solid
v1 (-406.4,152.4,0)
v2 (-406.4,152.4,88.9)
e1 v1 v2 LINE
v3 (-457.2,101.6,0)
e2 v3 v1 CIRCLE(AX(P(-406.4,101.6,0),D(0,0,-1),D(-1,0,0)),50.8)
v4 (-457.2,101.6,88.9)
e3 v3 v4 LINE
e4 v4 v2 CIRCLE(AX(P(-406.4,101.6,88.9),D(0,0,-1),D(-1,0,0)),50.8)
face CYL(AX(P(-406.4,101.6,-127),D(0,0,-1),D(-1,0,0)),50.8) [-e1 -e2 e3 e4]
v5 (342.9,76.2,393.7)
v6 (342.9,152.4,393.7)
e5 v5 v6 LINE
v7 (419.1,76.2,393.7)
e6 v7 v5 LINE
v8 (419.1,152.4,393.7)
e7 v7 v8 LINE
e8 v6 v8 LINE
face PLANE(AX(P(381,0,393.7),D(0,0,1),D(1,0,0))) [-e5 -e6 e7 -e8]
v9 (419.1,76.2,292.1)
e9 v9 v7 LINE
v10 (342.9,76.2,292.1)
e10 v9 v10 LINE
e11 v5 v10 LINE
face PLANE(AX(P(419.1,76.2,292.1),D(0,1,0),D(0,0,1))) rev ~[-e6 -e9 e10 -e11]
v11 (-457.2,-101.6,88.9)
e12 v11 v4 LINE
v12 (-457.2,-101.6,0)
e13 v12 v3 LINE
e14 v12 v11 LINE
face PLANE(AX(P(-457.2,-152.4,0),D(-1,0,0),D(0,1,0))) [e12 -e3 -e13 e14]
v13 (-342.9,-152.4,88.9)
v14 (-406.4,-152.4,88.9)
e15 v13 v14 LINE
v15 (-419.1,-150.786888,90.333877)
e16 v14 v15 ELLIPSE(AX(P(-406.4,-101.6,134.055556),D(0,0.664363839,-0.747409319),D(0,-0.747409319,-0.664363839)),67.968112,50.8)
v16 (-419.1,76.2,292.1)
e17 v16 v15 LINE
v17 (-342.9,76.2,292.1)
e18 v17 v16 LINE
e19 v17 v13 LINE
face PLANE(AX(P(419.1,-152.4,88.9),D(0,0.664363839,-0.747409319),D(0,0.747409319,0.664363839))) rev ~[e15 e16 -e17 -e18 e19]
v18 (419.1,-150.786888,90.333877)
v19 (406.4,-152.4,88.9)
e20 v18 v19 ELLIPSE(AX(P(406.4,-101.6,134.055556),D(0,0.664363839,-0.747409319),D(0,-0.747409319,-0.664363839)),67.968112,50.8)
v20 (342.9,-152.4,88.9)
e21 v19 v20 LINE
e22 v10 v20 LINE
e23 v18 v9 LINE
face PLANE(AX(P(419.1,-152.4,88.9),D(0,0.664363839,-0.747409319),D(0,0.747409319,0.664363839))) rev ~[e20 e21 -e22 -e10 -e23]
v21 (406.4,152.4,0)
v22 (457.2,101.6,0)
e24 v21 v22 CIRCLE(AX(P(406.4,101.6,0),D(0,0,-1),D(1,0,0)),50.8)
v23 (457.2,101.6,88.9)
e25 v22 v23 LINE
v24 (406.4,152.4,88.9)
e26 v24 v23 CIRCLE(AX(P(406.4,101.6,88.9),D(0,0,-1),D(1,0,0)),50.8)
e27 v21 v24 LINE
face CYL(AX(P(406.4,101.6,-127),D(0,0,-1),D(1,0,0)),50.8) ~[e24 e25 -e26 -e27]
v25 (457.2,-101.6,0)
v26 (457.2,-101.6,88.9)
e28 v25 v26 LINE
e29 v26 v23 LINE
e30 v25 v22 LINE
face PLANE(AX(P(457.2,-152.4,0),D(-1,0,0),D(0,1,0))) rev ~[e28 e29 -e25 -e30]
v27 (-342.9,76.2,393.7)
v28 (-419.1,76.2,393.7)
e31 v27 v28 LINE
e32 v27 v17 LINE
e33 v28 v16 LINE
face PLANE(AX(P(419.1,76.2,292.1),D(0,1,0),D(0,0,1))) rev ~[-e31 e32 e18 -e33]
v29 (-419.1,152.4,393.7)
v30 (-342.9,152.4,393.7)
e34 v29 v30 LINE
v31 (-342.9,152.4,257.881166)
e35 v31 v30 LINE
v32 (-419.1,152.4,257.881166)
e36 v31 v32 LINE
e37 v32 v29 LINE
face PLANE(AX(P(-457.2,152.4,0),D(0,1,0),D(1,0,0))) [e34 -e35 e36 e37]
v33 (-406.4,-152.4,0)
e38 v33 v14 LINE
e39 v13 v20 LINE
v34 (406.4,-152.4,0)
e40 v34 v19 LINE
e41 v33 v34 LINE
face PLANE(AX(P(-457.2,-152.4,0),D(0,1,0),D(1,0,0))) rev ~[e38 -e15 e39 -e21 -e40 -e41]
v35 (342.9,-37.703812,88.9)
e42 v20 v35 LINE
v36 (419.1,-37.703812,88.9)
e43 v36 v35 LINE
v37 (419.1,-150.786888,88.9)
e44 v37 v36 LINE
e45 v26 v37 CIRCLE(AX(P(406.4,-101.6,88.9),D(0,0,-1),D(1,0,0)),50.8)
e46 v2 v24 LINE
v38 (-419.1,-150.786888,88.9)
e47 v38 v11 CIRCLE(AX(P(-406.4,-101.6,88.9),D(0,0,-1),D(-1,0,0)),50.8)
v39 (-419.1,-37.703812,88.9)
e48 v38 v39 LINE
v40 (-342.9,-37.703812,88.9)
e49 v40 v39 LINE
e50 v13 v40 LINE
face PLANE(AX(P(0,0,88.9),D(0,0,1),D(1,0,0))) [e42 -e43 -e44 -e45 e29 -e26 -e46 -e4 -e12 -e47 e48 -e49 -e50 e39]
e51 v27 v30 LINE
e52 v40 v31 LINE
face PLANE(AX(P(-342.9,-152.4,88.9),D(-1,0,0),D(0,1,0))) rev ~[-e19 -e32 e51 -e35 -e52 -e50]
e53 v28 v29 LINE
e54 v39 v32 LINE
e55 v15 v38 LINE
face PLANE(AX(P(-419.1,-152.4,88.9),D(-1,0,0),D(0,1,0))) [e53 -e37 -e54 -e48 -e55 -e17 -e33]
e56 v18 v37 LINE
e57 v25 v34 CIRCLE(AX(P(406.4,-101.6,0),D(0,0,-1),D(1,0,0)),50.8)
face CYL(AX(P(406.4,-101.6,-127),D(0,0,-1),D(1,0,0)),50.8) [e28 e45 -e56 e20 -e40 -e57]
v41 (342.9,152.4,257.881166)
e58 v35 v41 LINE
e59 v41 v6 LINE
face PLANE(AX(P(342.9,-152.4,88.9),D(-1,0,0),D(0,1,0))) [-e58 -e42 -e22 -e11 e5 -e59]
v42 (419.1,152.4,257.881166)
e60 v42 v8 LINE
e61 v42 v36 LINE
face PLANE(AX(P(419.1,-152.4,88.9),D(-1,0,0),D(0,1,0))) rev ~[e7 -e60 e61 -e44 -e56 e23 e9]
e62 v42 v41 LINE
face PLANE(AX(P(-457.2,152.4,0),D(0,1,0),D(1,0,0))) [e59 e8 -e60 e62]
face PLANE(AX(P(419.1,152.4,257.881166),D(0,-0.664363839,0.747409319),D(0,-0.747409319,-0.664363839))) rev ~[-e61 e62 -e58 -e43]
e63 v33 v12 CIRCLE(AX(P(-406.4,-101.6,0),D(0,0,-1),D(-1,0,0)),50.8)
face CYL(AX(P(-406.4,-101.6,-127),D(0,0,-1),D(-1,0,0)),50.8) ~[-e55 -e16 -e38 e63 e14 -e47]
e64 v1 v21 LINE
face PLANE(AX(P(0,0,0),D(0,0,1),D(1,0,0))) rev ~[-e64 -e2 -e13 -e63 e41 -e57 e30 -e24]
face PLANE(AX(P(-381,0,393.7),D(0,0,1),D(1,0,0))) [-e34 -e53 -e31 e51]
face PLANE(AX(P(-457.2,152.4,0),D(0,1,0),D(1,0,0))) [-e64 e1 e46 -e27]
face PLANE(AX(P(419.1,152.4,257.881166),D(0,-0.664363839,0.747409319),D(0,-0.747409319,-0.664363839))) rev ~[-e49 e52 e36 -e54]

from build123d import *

# Parameters (mm, degrees)
F0_W        = 914.4
F0_H        = 304.8
F1_DEPTH    = 88.9
F2_W        = 76.2
F2_H        = 304.8
F3_DEPTH    = 304.8
F5_DEPTH    = 876.301
F6_T1_DEPTH = 342.9


# Not quite as in the source:
# - a fillet or chamfer that OpenCascade refuses, or shapes differently, is made with other operations: its cross-section is extruded or revolved along the edge and cut away or added


with BuildPart() as f1:
    # F0 (on Top) → F1 (new body)
    with BuildSketch(Plane.XY):
        Rectangle(F0_W, F0_H)
    extrude(amount=F1_DEPTH)

    # F2 (on face) → F3 (join)
    with BuildSketch(Plane.XY.offset(88.9)):
        with Locations((-381, 0)):
            Rectangle(F2_W, F2_H)
        with Locations((381, 0)):
            Rectangle(F2_W, F2_H)
    extrude(amount=F3_DEPTH)

    # F4 (on face) → F5 (cut, through all)
    with BuildSketch(Plane.YZ.offset(419.1)):
        Polygon((76.2, 292.1), (76.2, 393.7), (-152.4, 393.7), (-152.4, 88.9), align=None)
        Polygon((152.4, 88.9), (152.4, 257.8811658996), (-37.703811637, 88.9), align=None)
    extrude(amount=-F5_DEPTH, mode=Mode.SUBTRACT)

    # F6: fillet of radius 50.8 on 4 edges, made by hand

    # F6_s2 → F6_t1 (cut)
    with BuildSketch(Plane.XY.offset(-127)):
        with BuildLine():
            ThreePointArc((-457.2, -101.6), (-442.3210244843, -137.5210244843), (-406.4, -152.4))
            Line((-406.4, -152.4), (-457.2, -152.4))
            Line((-457.2, -152.4), (-457.2, -101.6))
        make_face()
        with BuildLine():
            ThreePointArc((457.2, -101.6), (442.3210244843, -137.5210244843), (406.4, -152.4))
            Line((406.4, -152.4), (457.2, -152.4))
            Line((457.2, -152.4), (457.2, -101.6))
        make_face()
        with BuildLine():
            ThreePointArc((457.2, 101.6), (442.3210244843, 137.5210244843), (406.4, 152.4))
            Line((406.4, 152.4), (457.2, 152.4))
            Line((457.2, 152.4), (457.2, 101.6))
        make_face()
        with BuildLine():
            ThreePointArc((-457.2, 101.6), (-442.3210244843, 137.5210244843), (-406.4, 152.4))
            Line((-406.4, 152.4), (-457.2, 152.4))
            Line((-457.2, 152.4), (-457.2, 101.6))
        make_face()
    extrude(amount=F6_T1_DEPTH, mode=Mode.SUBTRACT)


solid = f1.part
